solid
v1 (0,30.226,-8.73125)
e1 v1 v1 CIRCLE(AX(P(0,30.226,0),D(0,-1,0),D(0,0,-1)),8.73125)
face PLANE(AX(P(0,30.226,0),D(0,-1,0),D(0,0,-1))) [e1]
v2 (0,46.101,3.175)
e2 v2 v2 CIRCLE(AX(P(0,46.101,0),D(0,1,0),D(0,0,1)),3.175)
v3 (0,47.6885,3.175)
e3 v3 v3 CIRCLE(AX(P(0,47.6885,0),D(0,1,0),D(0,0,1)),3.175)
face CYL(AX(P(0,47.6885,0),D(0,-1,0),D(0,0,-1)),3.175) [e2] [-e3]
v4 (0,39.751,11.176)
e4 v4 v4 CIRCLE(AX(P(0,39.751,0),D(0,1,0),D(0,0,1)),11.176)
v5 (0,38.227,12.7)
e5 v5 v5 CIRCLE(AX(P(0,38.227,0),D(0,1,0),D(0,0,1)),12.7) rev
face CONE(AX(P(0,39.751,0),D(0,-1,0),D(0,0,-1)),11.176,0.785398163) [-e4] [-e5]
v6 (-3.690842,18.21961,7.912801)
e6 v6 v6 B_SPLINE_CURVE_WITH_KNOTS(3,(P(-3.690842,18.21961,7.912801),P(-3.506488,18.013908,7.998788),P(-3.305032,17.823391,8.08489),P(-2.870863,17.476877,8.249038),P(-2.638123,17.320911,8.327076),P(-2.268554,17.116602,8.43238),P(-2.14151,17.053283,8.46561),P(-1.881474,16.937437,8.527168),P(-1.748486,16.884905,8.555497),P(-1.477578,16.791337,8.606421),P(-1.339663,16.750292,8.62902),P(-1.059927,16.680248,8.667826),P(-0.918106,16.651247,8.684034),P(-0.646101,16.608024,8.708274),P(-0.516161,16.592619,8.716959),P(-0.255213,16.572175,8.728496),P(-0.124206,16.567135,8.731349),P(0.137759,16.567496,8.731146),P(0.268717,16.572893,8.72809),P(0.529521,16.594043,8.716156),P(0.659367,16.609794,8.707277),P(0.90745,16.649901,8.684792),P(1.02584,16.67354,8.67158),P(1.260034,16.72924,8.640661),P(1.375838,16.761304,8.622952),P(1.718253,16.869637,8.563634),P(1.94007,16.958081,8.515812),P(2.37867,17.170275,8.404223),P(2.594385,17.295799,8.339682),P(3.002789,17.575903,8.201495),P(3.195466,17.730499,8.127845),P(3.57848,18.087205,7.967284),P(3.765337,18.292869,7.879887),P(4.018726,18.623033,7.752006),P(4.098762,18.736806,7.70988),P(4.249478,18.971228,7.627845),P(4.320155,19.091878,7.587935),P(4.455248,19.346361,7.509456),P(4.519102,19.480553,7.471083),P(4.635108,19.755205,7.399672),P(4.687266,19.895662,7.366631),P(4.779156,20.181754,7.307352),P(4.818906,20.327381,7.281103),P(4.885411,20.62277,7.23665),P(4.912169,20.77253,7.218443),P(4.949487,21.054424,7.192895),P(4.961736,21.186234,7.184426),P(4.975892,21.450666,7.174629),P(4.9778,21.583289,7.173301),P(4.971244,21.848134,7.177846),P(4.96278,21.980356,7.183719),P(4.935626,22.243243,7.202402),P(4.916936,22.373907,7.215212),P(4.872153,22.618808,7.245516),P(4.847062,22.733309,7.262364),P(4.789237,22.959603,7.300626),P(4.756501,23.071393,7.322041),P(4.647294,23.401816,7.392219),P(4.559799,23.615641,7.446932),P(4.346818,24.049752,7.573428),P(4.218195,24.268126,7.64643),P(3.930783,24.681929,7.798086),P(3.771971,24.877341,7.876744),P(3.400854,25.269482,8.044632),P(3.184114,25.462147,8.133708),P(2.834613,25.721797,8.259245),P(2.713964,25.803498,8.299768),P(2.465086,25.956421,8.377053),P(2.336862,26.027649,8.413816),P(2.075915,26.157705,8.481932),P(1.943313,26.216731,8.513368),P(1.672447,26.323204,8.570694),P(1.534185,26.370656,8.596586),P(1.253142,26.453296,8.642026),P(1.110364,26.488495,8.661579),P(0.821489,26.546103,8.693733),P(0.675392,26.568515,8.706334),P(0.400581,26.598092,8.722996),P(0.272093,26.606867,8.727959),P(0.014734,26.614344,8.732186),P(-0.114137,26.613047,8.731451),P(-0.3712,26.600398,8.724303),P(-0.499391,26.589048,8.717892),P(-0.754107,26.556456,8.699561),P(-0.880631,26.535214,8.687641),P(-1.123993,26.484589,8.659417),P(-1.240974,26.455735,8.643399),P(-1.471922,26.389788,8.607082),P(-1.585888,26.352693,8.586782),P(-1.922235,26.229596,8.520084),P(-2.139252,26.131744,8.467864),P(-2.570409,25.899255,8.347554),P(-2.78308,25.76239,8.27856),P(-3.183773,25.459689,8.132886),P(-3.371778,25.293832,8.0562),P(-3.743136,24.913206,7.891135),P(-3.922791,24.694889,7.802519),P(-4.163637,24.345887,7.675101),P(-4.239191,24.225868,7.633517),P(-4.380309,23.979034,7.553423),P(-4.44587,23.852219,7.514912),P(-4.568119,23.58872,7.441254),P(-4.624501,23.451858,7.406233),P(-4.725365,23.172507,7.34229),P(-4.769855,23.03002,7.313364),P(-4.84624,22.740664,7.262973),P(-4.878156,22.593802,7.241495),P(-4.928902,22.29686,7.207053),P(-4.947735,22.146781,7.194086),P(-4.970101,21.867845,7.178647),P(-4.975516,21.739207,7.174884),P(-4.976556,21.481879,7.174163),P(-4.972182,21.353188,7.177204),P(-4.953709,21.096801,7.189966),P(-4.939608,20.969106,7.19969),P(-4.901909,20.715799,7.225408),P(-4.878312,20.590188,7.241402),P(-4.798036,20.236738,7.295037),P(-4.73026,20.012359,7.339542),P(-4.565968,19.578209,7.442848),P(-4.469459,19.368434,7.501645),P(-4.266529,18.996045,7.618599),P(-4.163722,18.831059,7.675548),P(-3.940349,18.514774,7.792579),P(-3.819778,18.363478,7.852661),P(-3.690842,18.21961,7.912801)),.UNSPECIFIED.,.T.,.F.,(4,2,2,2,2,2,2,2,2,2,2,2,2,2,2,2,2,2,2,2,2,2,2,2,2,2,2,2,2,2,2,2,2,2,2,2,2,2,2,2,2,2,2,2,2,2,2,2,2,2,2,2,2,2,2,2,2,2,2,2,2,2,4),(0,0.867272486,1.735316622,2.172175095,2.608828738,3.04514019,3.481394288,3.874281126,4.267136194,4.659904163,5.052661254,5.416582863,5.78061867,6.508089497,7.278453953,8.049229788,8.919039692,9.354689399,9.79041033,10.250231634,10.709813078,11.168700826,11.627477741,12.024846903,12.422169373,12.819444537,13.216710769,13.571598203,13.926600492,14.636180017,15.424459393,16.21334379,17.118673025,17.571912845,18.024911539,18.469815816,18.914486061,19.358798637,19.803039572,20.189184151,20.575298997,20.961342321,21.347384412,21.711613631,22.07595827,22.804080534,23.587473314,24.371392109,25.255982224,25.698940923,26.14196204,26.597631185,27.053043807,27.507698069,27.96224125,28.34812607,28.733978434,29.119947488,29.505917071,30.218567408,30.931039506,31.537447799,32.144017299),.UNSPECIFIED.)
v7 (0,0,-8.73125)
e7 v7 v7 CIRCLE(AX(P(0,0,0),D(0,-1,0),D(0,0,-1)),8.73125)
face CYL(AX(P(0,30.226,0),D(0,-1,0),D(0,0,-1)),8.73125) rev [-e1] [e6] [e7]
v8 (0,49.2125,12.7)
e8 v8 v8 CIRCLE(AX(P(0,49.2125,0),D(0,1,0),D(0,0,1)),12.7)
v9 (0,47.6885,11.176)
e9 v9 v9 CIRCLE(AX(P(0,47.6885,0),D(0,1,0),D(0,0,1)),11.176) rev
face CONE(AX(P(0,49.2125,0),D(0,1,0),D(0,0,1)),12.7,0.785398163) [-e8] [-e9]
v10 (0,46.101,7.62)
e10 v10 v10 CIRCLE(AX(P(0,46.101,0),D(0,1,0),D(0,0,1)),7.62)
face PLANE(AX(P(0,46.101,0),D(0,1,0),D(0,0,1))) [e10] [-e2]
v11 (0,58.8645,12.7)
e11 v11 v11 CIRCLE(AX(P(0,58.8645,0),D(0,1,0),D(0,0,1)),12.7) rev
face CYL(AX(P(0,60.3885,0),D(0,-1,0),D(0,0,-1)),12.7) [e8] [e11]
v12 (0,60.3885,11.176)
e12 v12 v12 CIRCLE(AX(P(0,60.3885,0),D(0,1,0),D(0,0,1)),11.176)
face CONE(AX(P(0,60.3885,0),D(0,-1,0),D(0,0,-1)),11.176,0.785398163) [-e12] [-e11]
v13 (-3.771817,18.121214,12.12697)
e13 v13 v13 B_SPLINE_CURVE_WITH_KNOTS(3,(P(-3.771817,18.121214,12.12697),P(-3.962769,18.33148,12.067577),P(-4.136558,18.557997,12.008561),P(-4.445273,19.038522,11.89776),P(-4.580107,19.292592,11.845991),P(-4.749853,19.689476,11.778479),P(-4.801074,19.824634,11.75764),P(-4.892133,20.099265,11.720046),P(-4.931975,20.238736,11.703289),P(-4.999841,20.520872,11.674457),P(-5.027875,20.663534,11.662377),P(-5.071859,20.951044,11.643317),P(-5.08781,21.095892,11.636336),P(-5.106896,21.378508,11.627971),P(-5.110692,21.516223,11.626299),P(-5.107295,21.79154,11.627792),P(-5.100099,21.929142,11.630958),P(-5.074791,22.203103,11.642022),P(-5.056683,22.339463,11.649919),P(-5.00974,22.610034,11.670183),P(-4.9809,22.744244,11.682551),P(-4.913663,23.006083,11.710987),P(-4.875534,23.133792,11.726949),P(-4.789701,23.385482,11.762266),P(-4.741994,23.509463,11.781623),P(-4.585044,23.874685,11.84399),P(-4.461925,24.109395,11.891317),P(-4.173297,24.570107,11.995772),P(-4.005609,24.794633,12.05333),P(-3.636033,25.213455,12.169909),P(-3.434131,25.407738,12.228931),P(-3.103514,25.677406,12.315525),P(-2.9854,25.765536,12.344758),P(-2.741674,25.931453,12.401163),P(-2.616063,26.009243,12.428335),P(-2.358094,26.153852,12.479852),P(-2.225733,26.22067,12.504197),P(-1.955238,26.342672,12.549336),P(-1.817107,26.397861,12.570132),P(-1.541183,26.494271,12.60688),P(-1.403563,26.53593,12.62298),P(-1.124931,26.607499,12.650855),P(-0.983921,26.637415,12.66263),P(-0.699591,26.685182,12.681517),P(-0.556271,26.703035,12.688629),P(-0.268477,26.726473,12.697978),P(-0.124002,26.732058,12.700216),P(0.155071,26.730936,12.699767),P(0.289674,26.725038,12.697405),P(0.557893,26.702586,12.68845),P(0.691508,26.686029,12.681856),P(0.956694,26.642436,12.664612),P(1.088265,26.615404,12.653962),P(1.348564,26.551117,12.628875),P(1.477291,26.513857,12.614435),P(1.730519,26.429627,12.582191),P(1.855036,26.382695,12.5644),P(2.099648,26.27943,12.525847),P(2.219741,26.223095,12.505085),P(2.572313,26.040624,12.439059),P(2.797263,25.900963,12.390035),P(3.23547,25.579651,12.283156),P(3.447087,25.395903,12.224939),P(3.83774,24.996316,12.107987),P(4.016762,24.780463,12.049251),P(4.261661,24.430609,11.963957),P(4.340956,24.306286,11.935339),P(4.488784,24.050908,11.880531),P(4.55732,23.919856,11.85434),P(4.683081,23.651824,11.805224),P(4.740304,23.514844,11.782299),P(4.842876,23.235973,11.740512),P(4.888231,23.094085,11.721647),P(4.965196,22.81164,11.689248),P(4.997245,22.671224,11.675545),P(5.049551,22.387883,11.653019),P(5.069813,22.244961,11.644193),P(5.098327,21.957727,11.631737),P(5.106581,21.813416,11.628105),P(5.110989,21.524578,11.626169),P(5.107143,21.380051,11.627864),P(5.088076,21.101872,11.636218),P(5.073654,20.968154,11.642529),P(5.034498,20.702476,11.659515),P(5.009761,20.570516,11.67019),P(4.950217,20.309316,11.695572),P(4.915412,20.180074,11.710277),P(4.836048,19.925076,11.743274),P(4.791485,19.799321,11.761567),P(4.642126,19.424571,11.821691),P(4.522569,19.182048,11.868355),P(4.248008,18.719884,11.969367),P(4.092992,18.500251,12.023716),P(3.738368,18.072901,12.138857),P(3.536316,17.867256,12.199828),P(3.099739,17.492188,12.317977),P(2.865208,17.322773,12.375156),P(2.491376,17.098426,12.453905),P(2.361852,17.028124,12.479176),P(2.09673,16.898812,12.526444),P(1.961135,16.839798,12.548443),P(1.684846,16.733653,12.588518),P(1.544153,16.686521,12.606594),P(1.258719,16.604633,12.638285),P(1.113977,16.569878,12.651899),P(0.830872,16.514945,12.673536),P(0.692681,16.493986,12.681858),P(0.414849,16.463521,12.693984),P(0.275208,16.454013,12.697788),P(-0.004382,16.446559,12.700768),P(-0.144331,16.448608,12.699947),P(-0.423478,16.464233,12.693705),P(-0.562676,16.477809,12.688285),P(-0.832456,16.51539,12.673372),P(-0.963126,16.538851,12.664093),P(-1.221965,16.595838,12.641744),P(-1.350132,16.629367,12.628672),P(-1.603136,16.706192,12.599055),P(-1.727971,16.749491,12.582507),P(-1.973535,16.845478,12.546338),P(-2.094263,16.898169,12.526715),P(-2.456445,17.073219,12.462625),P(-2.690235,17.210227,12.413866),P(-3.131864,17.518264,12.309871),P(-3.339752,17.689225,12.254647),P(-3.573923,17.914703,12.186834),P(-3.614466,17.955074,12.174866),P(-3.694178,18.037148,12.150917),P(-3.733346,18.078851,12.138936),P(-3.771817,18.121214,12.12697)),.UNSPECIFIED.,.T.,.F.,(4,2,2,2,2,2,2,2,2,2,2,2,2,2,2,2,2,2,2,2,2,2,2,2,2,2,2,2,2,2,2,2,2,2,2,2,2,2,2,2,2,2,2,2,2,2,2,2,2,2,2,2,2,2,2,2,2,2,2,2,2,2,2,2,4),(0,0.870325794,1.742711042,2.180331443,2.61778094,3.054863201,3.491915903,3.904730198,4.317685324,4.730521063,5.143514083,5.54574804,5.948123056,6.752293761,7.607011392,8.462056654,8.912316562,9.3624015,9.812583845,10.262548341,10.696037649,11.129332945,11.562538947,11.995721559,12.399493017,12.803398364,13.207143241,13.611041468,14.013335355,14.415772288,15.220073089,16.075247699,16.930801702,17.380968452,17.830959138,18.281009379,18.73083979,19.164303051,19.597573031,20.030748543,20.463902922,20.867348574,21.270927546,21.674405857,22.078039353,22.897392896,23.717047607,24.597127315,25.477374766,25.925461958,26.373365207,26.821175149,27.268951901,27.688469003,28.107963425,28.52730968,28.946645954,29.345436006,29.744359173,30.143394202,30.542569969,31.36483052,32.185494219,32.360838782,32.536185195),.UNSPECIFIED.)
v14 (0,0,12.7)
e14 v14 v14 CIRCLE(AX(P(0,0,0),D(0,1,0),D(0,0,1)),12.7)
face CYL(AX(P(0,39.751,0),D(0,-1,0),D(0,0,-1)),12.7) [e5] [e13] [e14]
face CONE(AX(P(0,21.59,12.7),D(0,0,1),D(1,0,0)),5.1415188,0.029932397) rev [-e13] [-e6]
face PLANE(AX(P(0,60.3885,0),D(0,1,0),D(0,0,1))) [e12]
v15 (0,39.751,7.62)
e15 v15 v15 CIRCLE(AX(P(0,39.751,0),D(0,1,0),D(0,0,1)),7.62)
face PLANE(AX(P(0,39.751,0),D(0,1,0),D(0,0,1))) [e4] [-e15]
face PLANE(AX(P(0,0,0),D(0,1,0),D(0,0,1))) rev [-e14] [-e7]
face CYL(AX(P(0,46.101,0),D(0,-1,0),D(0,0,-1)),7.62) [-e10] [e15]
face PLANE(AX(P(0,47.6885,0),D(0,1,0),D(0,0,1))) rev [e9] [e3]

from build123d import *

# Parameters (mm, degrees)
SKETCH1_R           = 12.7
BOSS_EXTRUDE1_DEPTH = 39.751
SKETCH2_R           = 8.73125
CUT_EXTRUDE1_DEPTH  = 30.226
SKETCH4_R           = 7.62
BOSS_EXTRUDE2_DEPTH = 6.35
SKETCH5_R           = 3.175
BOSS_EXTRUDE3_DEPTH = 1.5875
SKETCH7_R           = 12.7
BOSS_EXTRUDE4_DEPTH = 12.7
CHAMFER1_SIZE       = 1.524


# Read off the part's stored shape, not the designer's step: 1/8 NPT Tapped Hole1
with BuildPart() as part:
    # Sketch1 → Boss-Extrude1 (new body)
    with BuildSketch(Plane(origin=(0, 0, 0), x_dir=(1, 0, 0), z_dir=(0, 1, 0))):
        with Locations(Location((0, 0, 0), (0, 0, 270))):
            Circle(SKETCH1_R)
    extrude(amount=BOSS_EXTRUDE1_DEPTH)

    # Sketch2 → Cut-Extrude1 (cut)
    with BuildSketch(Plane.XZ):
        with Locations(Location((0, 0, 0), (0, 0, 270))):
            Circle(SKETCH2_R)
    extrude(amount=-CUT_EXTRUDE1_DEPTH, mode=Mode.SUBTRACT)

    # Sketch4 → Boss-Extrude2 (add)
    with BuildSketch(Plane(origin=(0, 39.751, 0), x_dir=(1, 0, 0), z_dir=(0, 1, 0))):
        with Locations(Location((0, 0, 0), (0, 0, 270))):
            Circle(SKETCH4_R)
    extrude(amount=BOSS_EXTRUDE2_DEPTH)

    # Sketch5 → Boss-Extrude3 (add)
    with BuildSketch(Plane(origin=(0, 46.101, 0), x_dir=(1, 0, 0), z_dir=(0, 1, 0))):
        with Locations(Location((0, 0, 0), (0, 0, 270))):
            Circle(SKETCH5_R)
    extrude(amount=BOSS_EXTRUDE3_DEPTH)

    # Sketch7 → Boss-Extrude4 (add)
    with BuildSketch(Plane(origin=(0, 47.6885, 0), x_dir=(1, 0, 0), z_dir=(0, 1, 0))):
        with Locations(Location((0, 0, 0), (0, 0, 270))):
            Circle(SKETCH7_R)
    extrude(amount=BOSS_EXTRUDE4_DEPTH)

    # Chamfer1
    chamfer1_edges = [part.edges().sort_by_distance(p)[0] for p in [
        (0, 47.6885, -12.7),
        (0, 60.3885, -12.7),
        (0, 39.751, -12.7),
    ]]
    chamfer(chamfer1_edges, length=CHAMFER1_SIZE)

    # 1/8 NPT Tapped Hole1 outline → 1/8 NPT Tapped Hole1 (revolve, cut)
    with BuildSketch(Plane.XZ.offset(-21.59)):
        Polygon((5.141518805, 12.700000181), (0, 12.700000181), (0, 7.174156466), (4.976067645, 7.174156466), align=None)
    revolve(axis=Axis((0, 21.59, 0), (0, 0, 1)), mode=Mode.SUBTRACT)


solid = part.part
